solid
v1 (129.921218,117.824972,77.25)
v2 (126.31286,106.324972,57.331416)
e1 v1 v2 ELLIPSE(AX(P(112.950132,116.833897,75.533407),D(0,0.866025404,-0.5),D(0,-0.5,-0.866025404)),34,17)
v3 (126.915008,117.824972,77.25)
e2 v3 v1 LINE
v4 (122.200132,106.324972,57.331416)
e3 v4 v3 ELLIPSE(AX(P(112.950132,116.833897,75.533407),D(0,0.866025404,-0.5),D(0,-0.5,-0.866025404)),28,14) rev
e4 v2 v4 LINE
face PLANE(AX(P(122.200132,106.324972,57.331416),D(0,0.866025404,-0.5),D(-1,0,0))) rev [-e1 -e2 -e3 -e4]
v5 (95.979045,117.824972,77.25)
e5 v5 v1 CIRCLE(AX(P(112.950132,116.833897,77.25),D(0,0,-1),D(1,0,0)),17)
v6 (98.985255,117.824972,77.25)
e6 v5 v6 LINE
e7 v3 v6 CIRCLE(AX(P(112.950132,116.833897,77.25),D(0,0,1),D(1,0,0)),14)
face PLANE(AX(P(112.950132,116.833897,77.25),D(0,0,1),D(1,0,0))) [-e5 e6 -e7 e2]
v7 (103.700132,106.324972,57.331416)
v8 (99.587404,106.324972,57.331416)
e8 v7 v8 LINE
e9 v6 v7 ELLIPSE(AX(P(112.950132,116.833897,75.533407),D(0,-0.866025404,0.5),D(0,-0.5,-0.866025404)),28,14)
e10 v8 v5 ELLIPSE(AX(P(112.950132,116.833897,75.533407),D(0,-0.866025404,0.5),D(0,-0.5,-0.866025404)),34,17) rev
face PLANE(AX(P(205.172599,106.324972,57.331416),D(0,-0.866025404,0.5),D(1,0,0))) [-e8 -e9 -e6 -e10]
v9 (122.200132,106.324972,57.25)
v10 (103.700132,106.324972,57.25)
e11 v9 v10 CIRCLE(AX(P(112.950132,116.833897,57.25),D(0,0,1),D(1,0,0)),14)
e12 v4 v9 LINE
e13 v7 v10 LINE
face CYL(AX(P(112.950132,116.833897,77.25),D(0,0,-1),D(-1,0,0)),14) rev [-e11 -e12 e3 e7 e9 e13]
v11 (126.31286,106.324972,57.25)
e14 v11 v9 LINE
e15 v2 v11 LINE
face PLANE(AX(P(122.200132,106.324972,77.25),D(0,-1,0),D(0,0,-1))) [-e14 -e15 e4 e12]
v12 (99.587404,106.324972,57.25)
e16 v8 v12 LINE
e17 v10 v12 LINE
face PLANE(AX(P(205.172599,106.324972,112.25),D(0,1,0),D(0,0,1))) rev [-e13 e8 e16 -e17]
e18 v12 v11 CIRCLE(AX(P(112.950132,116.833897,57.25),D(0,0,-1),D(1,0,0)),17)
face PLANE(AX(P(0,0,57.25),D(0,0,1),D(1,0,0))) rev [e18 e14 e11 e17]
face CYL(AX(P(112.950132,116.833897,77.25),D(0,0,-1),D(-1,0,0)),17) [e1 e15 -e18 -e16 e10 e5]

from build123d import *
from OCP.BRepAlgoAPI import BRepAlgoAPI_Cut
from OCP.TopTools import TopTools_ListOfShape

# Parameters (mm, degrees)
BOSS_EXTRUDE1_DEPTH              = 5
SKETCH2_R                        = 2.5
BOSS_EXTRUDE2_DEPTH              = 100
SKETCH3_W                        = 5
SKETCH3_H                        = 5
BOSS_EXTRUDE3_DEPTH              = 10
SKETCH5_W                        = 5
SKETCH5_H                        = 4.330127019
BOSS_EXTRUDE4_DEPTH              = 117
SKETCH6_W                        = 5
SKETCH6_H                        = 5
BOSS_EXTRUDE5_DEPTH              = 20
BOSS_EXTRUDE6_DEPTH              = 15
SKETCH9_W                        = 5
SKETCH9_H                        = 5
BOSS_EXTRUDE7_DEPTH              = 10
SKETCH10_W                       = 5
SKETCH10_H                       = 5
BOSS_EXTRUDE8_DEPTH              = 99.159909
SKETCH11_W                       = 10
SKETCH11_H                       = 3
BOSS_EXTRUDE9_DEPTH              = 10
CUT_EXTRUDE1_DEPTH               = 187.084790711
CUT_EXTRUDE1_DEPTH_BACK          = 187.084790711
SKETCH13_R                       = 2
SKETCH14_W                       = 10
SKETCH14_H                       = 3
BOSS_EXTRUDE10_DEPTH             = 20
CUT_EXTRUDE2_DEPTH               = 194.255140511
CUT_EXTRUDE2_DEPTH_BACK          = 194.255140511
SKETCH15_R                       = 2
BOSS_EXTRUDE11_DEPTH             = 7.8
CUT_EXTRUDE3_DEPTH               = 187.016127587
CUT_EXTRUDE3_DEPTH_BACK          = 187.016127587
SKETCH17_W                       = 22.17902444
SKETCH17_H                       = 20
BOSS_EXTRUDE12_DEPTH             = 5.75
BOSS_EXTRUDE12_DEPTH_BACK        = 5
SKETCH19_W                       = 1.5
SKETCH19_H                       = 10.75
BOSS_EXTRUDE13_DEPTH             = 2.742414
SKETCH21_W                       = 1.5
SKETCH21_H                       = 1
BOSS_EXTRUDE15_DEPTH             = 1
BOSS_EXTRUDE17_REACH             = 195.512
CUT_EXTRUDE4_START               = 2
SKETCH23_W                       = 7.8
SKETCH23_H                       = 12
CUT_EXTRUDE4_DEPTH               = 10
BOSS_EXTRUDE19_DEPTH             = 5
BOSS_EXTRUDE19_DEPTH_BACK        = 2.165064
SKETCH23_2_W                     = 7.8
SKETCH23_2_H                     = 12
CUT_EXTRUDE5_DEPTH               = 1.25
BOSS_EXTRUDE20_REACH             = 188.016
SKETCH25_W                       = 5
SKETCH25_H                       = 4.330127019
SKETCH26_W                       = 5
SKETCH26_H                       = 2.16506351
CUT_EXTRUDE6_DEPTH               = 5
SKETCH27_W                       = 5.75
SKETCH27_H                       = 7.16506351
BOSS_EXTRUDE21_DEPTH             = 5
SKETCH29_W                       = 3
SKETCH29_H                       = 30
BOSS_EXTRUDE22_DEPTH             = 55
SKETCH30_W                       = 5
SKETCH30_H                       = 3
BOSS_EXTRUDE23_DEPTH             = 5
SKETCH31_W                       = 5
SKETCH31_H                       = 5
BOSS_EXTRUDE24_DEPTH             = 33.5
SKETCH32_W                       = 2
SKETCH32_H                       = 19
BOSS_EXTRUDE25_DEPTH             = 12
SKETCH34_W                       = 41
SKETCH34_H                       = 3
CUT_EXTRUDE7_DEPTH               = 30
SKETCH35_W                       = 14
SKETCH35_H                       = 12
BOSS_EXTRUDE26_DEPTH             = 7
BOSS_EXTRUDE27_REACH             = 187.154
SKETCH36_W                       = 9
SKETCH36_H                       = 5
BOSS_EXTRUDE27_DIRECTION_2_REACH = 187.154
SKETCH37_W                       = 41.5
SKETCH37_H                       = 5
BOSS_EXTRUDE28_DEPTH             = 41
SKETCH38_W                       = 34.251665069
SKETCH38_H                       = 27.087918127
CUT_EXTRUDE8_DEPTH               = 185.330721404
SKETCH39_W                       = 67.684653824
SKETCH39_H                       = 30.030202731
CUT_EXTRUDE9_DEPTH               = 190.235302527
SKETCH44_W                       = 5
SKETCH44_H                       = 7.16506351
BOSS_EXTRUDE30_DEPTH             = 18.612596
BOSS_EXTRUDE31_DEPTH             = 20
BOSS_EXTRUDE32_DEPTH             = 15
SKETCH46_W                       = 5
SKETCH46_H                       = 5
EDIT_THIS_LENGTH_DEPTH           = 50
SKETCH47_W                       = 5
SKETCH47_H                       = 3
BOSS_EXTRUDE34_DEPTH             = 5
CUT_EXTRUDE11_DEPTH              = 203.657530065
CUT_EXTRUDE11_DEPTH_BACK         = 203.657530065
SKETCH53_W                       = 268.348847746
SKETCH53_H                       = 124.858242806


with BuildPart() as part:
    # Sketch1 → Boss-Extrude1 (new body)
    with BuildSketch(Plane(origin=(0, 0, 0), x_dir=(1, 0, 0), z_dir=(0, 1, 0))):
        Polygon((121, 0), (0, 0), (0, -68), (5, -68), (5, -5), (116, -5), (116, -68), (121, -68), align=None)
    extrude(amount=BOSS_EXTRUDE1_DEPTH)

    # Sketch2 → Boss-Extrude2 (add)
    with BuildSketch(Plane(origin=(0, 3.75, 2.165063509), x_dir=(1, 0, 0), z_dir=(0, 0.866025403784438, 0.500000000000001))):
        with Locations(Location((118.200131686, -0.299868314, 0), (0, 0, 90))):
            Circle(SKETCH2_R)
    extrude(amount=BOSS_EXTRUDE2_DEPTH)

    # Sketch3 → Boss-Extrude3 (add)
    with BuildSketch(Plane(origin=(121, 0, 0), x_dir=(0, 0, -1), z_dir=(1, 0, 0))):
        with Locations((-2.5, 2.5)):
            Rectangle(SKETCH3_W, SKETCH3_H)
    extrude(amount=BOSS_EXTRUDE3_DEPTH)

    # Sketch5 → Boss-Extrude4 (add)
    with BuildSketch(Plane(origin=(0, 3.75, 2.165063509), x_dir=(1, 0, 0), z_dir=(0, 0.866025403784438, 0.500000000000001))):
        with Locations((128.5, 0.33493649)):
            Rectangle(SKETCH5_W, SKETCH5_H)
    extrude(amount=BOSS_EXTRUDE4_DEPTH)

    # Sketch6 → Boss-Extrude5 (add)
    with BuildSketch(Plane(origin=(0, 1.25, -2.165063509), x_dir=(-1, 0, 0), z_dir=(0, 0.5000000000000009, -0.866025403784438))):
        with Locations((-128.5, 118.830127019)):
            Rectangle(SKETCH6_W, SKETCH6_H)
    extrude(amount=BOSS_EXTRUDE5_DEPTH)

    # Sketch7 → Boss-Extrude6 (add)
    with BuildSketch(Plane.ZY.offset(-126)):
        Polygon((45.509618943, 113.824972243), (41.179491924, 116.324972243), (38.679491924, 111.994845224), (43.009618943, 109.494845224), align=None)
    extrude(amount=BOSS_EXTRUDE6_DEPTH)

    # Sketch9 → Boss-Extrude7 (add)
    with BuildSketch(Plane(origin=(121, 0, 0), x_dir=(0, 0, -1), z_dir=(1, 0, 0))):
        with Locations((-59.75, 2.5)):
            Rectangle(SKETCH9_W, SKETCH9_H)
    extrude(amount=BOSS_EXTRUDE7_DEPTH)

    # Sketch10 → Boss-Extrude8 (add)
    with BuildSketch(Plane(origin=(0, 5, 0), x_dir=(1, 0, 0), z_dir=(0, 1, 0))):
        with Locations((128.5, -59.75)):
            Rectangle(SKETCH10_W, SKETCH10_H)
    extrude(amount=BOSS_EXTRUDE8_DEPTH)

    # Sketch11 → Boss-Extrude9 (add)
    with BuildSketch(Plane.ZY):
        with Locations((57.25, 1.5)):
            Rectangle(SKETCH11_W, SKETCH11_H)
        with Locations((5, 1.5)):
            Rectangle(SKETCH11_W, SKETCH11_H)
    extrude(amount=BOSS_EXTRUDE9_DEPTH)

    # Sketch13 → Cut-Extrude1 (cut, two sides: drawn at the far end of the back side and taken through both)
    with BuildSketch(Plane(origin=(0, 3, 0), x_dir=(1, 0, 0), z_dir=(0, 1, 0)).offset(-CUT_EXTRUDE1_DEPTH_BACK)):
        with Locations(Location((-5, -5, 0), (0, 0, 270))):
            Circle(SKETCH13_R)
        with Locations(Location((-5, -57.25, 0), (0, 0, 270))):
            Circle(SKETCH13_R)
    extrude(amount=CUT_EXTRUDE1_DEPTH + CUT_EXTRUDE1_DEPTH_BACK, mode=Mode.SUBTRACT)

    # Sketch14 → Boss-Extrude10 (add)
    with BuildSketch(Plane(origin=(121, 0, 0), x_dir=(0, 0, -1), z_dir=(1, 0, 0))):
        with Locations((-15, 1.5)):
            Rectangle(SKETCH14_W, SKETCH14_H)
        with Locations((-47.25, 1.5)):
            Rectangle(SKETCH14_W, SKETCH14_H)
    extrude(amount=BOSS_EXTRUDE10_DEPTH)

    # Sketch15 → Cut-Extrude2 (cut, two sides: drawn at the far end of the back side and taken through both)
    with BuildSketch(Plane(origin=(0, 3, 0), x_dir=(1, 0, 0), z_dir=(0, 1, 0)).offset(-CUT_EXTRUDE2_DEPTH_BACK)):
        with Locations(Location((136, -15, 0), (0, 0, 270))):
            Circle(SKETCH15_R)
        with Locations(Location((136, -47.25, 0), (0, 0, 270))):
            Circle(SKETCH15_R)
    extrude(amount=CUT_EXTRUDE2_DEPTH + CUT_EXTRUDE2_DEPTH_BACK, mode=Mode.SUBTRACT)

    # Sketch16 → Boss-Extrude11 (add)
    with BuildSketch(Plane.ZY.offset(-126)):
        Polygon((49.839745962, 111.324972243), (67, 101.417494955), (64.5, 97.087367936), (47.339745962, 106.994845224), align=None)
    extrude(amount=BOSS_EXTRUDE11_DEPTH)

    # Sketch17 → Cut-Extrude3 (cut, two sides: drawn at the far end of the back side and taken through both)
    with BuildSketch(Plane(origin=(0, 105.074972243, 60.665063509), x_dir=(1, 0, 0), z_dir=(0, 0.8660254037844382, 0.500000000000001)).offset(-CUT_EXTRUDE3_DEPTH_BACK)):
        with Locations((119.91048778, 12.5)):
            Rectangle(SKETCH17_W, SKETCH17_H)
    extrude(amount=CUT_EXTRUDE3_DEPTH + CUT_EXTRUDE3_DEPTH_BACK, mode=Mode.SUBTRACT)



with BuildPart() as body_2:
    # Sketch18 → Boss-Extrude12 (new, two sides: drawn at the far end of the back side and taken through both)
    with BuildSketch(Plane.XY.offset(62.25).offset(-BOSS_EXTRUDE12_DEPTH_BACK)):
        with BuildLine():
            Line((118.2, 104.159908733), (119.7, 104.159908733))
            ThreePointArc((119.7, 104.159908733), (110.2, 113.659908733), (100.7, 104.159908733))
            Line((100.7, 104.159908733), (102.2, 104.159908733))
            ThreePointArc((102.2, 104.159908733), (110.2, 112.159908733), (118.2, 104.159908733))
        make_face()
    extrude(amount=BOSS_EXTRUDE12_DEPTH + BOSS_EXTRUDE12_DEPTH_BACK)


with BuildPart() as part_1:
    add(part.part)

    add(body_2.part)  # Boss-Extrude13 merges body 2
    # Sketch19 → Boss-Extrude13 (add)
    with BuildSketch(Plane.XZ.offset(-104.159908733)):
        with Locations((118.95, 62.625)):
            Rectangle(SKETCH19_W, SKETCH19_H)
    extrude(amount=BOSS_EXTRUDE13_DEPTH)

    # Sketch21 → Boss-Extrude15 (add)
    with BuildSketch(Plane.XZ.offset(-101.417494955)):
        with Locations((118.95, 67.5)):
            Rectangle(SKETCH21_W, SKETCH21_H)
    extrude(amount=BOSS_EXTRUDE15_DEPTH)

    # Boss-Extrude17: up to this plane
    boss_extrude17_end = Plane(origin=(119.7, 101.417494955, 68), z_dir=(0, 0, -1))
    # Sketch20 → Boss-Extrude17 (add, up to the surface)
    with BuildSketch(Plane(origin=(0, -3.657477288, 6.334936491), x_dir=(1, 0, 0), z_dir=(0, -0.5000000000000039, 0.8660254037844365)), mode=Mode.PRIVATE) as boss_extrude17_sk1:
        Polygon((126, 116.330127019), (126, 121.330127019), (119.7, 121.330127019), (118.2, 121.330127019), (118.2, 116.330127019), align=None)
    boss_extrude17_tool1 = split(extrude(boss_extrude17_sk1.sketch, amount=BOSS_EXTRUDE17_REACH, mode=Mode.PRIVATE), bisect_by=boss_extrude17_end, keep=Keep.BOTH, mode=Mode.PRIVATE)
    add(boss_extrude17_tool1.solids().sort_by_distance((122.1, 99.252431, 65.75))[0])

    # Sketch23 → Cut-Extrude4 (cut)
    with BuildSketch(Plane(origin=(0, 104.159908733, 0), x_dir=(-1, 0, 0), z_dir=(0, -1, 0)).offset(CUT_EXTRUDE4_START)):
        with Locations((-122.1, -62)):
            Rectangle(SKETCH23_W, SKETCH23_H)
    extrude(amount=CUT_EXTRUDE4_DEPTH, mode=Mode.SUBTRACT)

    # Sketch23<2> → Boss-Extrude19 (add, two sides: drawn at the far end of the back side and taken through both)
    with BuildSketch(Plane(origin=(0, 104.159908733, 0), x_dir=(-1, 0, 0), z_dir=(0, -1, 0)).offset(-BOSS_EXTRUDE19_DEPTH_BACK)):
        with Locations((-122.1, -62)):
            Rectangle(SKETCH23_2_W, SKETCH23_2_H)
    extrude(amount=BOSS_EXTRUDE19_DEPTH + BOSS_EXTRUDE19_DEPTH_BACK)


with BuildPart() as cut_extrude5_tool:
    # Sketch24 → Cut-Extrude5 (new body)
    with BuildSketch(Plane(origin=(0, 0, 56), x_dir=(-1, 0, 0), z_dir=(0, 0, -1))):
        Polygon((-126, 106.324972243), (-126, 101.994845224), (-126, 99.159908733), (-118.2, 99.159908733), (-118.2, 106.324972243), align=None)
    extrude(amount=-CUT_EXTRUDE5_DEPTH)


with BuildPart() as part_2:
    add(part_1.part)

    # Cut-Extrude5: cut by cut_extrude5_tool, with a tolerance
    cut_extrude5_stock = TopTools_ListOfShape()
    cut_extrude5_stock.Append(part_2.part.wrapped)
    cut_extrude5_tools = TopTools_ListOfShape()
    cut_extrude5_tools.Append(cut_extrude5_tool.part.wrapped)
    cut_extrude5_cut = BRepAlgoAPI_Cut()
    cut_extrude5_cut.SetArguments(cut_extrude5_stock)
    cut_extrude5_cut.SetTools(cut_extrude5_tools)
    cut_extrude5_cut.SetFuzzyValue(0.00001)
    cut_extrude5_cut.Build()
    add(Compound.cast(cut_extrude5_cut.Shape()).solids(), mode=Mode.REPLACE)

    # Boss-Extrude20: up to this face of the body (flat: up to its plane)
    boss_extrude20_end = Plane(part_2.part.faces().sort_by_distance((122.724999943, 106.324972733, 62.625))[0])
    # Sketch25 → Boss-Extrude20 (add, up to the picked face)
    with BuildSketch(Plane(origin=(0, 105.074972243, 60.665063509), x_dir=(1, 0, 0), z_dir=(0, 0.8660254037844382, 0.500000000000001)), mode=Mode.PRIVATE) as boss_extrude20_sk1:
        with Locations((128.5, 0.33493649)):
            Rectangle(SKETCH25_W, SKETCH25_H)
    boss_extrude20_tool1 = split(extrude(boss_extrude20_sk1.sketch, amount=BOSS_EXTRUDE20_REACH, mode=Mode.PRIVATE), bisect_by=boss_extrude20_end, keep=Keep.BOTH, mode=Mode.PRIVATE)
    add(boss_extrude20_tool1.solids().sort_by(Axis((128.5, 105.24244, 60.375), (0, 0.8660254037844382, 0.500000000000001)))[0])


with BuildPart() as cut_extrude6_tool:
    # Sketch26 → Cut-Extrude6 (new body)
    with BuildSketch(Plane.XY.offset(62.25)):
        with Locations((128.5, 105.242440488)):
            Rectangle(SKETCH26_W, SKETCH26_H)
    extrude(amount=CUT_EXTRUDE6_DEPTH)


with BuildPart() as part_3:
    add(part_2.part)

    # Cut-Extrude6: cut by cut_extrude6_tool, with a tolerance
    cut_extrude6_stock = TopTools_ListOfShape()
    cut_extrude6_stock.Append(part_3.part.wrapped)
    cut_extrude6_tools = TopTools_ListOfShape()
    cut_extrude6_tools.Append(cut_extrude6_tool.part.wrapped)
    cut_extrude6_cut = BRepAlgoAPI_Cut()
    cut_extrude6_cut.SetArguments(cut_extrude6_stock)
    cut_extrude6_cut.SetTools(cut_extrude6_tools)
    cut_extrude6_cut.SetFuzzyValue(0.00001)
    cut_extrude6_cut.Build()
    add(Compound.cast(cut_extrude6_cut.Shape()).solids(), mode=Mode.REPLACE)

    # Sketch27 → Boss-Extrude21 (add)
    with BuildSketch(Plane(origin=(126, 0, 0), x_dir=(0, 0, -1), z_dir=(1, 0, 0))):
        with Locations((-65.125, 102.742440488)):
            Rectangle(SKETCH27_W, SKETCH27_H)
    extrude(amount=BOSS_EXTRUDE21_DEPTH)

    # Sketch29 → Boss-Extrude22 (add)
    with BuildSketch(Plane.ZY):
        with Locations((40, 20)):
            Rectangle(SKETCH29_W, SKETCH29_H)
    extrude(amount=-BOSS_EXTRUDE22_DEPTH)

    # Sketch30 → Boss-Extrude23 (add)
    with BuildSketch(Plane.XZ.offset(-5)):
        with Locations((52.5, 40)):
            Rectangle(SKETCH30_W, SKETCH30_H)
    extrude(amount=BOSS_EXTRUDE23_DEPTH)

    # Sketch31 → Boss-Extrude24 (add)
    with BuildSketch(Plane(origin=(0, 0, 38.5), x_dir=(-1, 0, 0), z_dir=(0, 0, -1))):
        with Locations((-52.5, 2.5)):
            Rectangle(SKETCH31_W, SKETCH31_H)
    extrude(amount=BOSS_EXTRUDE24_DEPTH)

    # Sketch32 → Boss-Extrude25 (add)
    with BuildSketch(Plane(origin=(0, 0, 38.5), x_dir=(-1, 0, 0), z_dir=(0, 0, -1))):
        Polygon((-41, 9), (-53, 9), (-53, 35), (-55, 35), (-55, 7), (-41, 7), align=None)
        with Locations((-42, 25.5)):
            Rectangle(SKETCH32_W, SKETCH32_H)
    extrude(amount=BOSS_EXTRUDE25_DEPTH)

    # Sketch34 → Cut-Extrude7 (cut)
    with BuildSketch(Plane(origin=(0, 35, 0), x_dir=(1, 0, 0), z_dir=(0, 1, 0))):
        with Locations((20.5, -40)):
            Rectangle(SKETCH34_W, SKETCH34_H)
    extrude(amount=-CUT_EXTRUDE7_DEPTH, mode=Mode.SUBTRACT)

    # Sketch35 → Boss-Extrude26 (add)
    with BuildSketch(Plane.XZ.offset(-7)):
        with Locations((48, 32.5)):
            Rectangle(SKETCH35_W, SKETCH35_H)
    extrude(amount=BOSS_EXTRUDE26_DEPTH)

    # Boss-Extrude27: up to this face of the body (flat: up to its plane)
    boss_extrude27_end = Plane(part_3.part.faces().sort_by_distance((48.252808989, 19.016853933, 41.5))[0])
    # Sketch36 → Boss-Extrude27 (add, up to the picked face)
    with BuildSketch(Plane.XY.offset(38.5), mode=Mode.PRIVATE) as boss_extrude27_sk1:
        with Locations((45.5, 2.5)):
            Rectangle(SKETCH36_W, SKETCH36_H)
    boss_extrude27_tool1 = split(extrude(boss_extrude27_sk1.sketch, amount=BOSS_EXTRUDE27_REACH, mode=Mode.PRIVATE), bisect_by=boss_extrude27_end, keep=Keep.BOTH, mode=Mode.PRIVATE)
    add(boss_extrude27_tool1.solids().sort_by(Axis((45.5, 2.5, 38.5), (0, 0, 1)))[0])

    # Boss-Extrude27 direction 2: up to this face of the body (flat: up to its plane)
    boss_extrude27_direction_2_end = Plane(part_3.part.faces().sort_by_distance((27.5, 2.5, 5))[0])
    # Sketch36 → Boss-Extrude27 direction 2 (add, up to the picked face)
    with BuildSketch(Plane.XY.offset(38.5), mode=Mode.PRIVATE) as boss_extrude27_direction_2_sk1:
        with Locations((45.5, 2.5)):
            Rectangle(SKETCH36_W, SKETCH36_H)
    boss_extrude27_direction_2_tool1 = split(extrude(boss_extrude27_direction_2_sk1.sketch, amount=-BOSS_EXTRUDE27_DIRECTION_2_REACH, mode=Mode.PRIVATE), bisect_by=boss_extrude27_direction_2_end, keep=Keep.BOTH, mode=Mode.PRIVATE)
    add(boss_extrude27_direction_2_tool1.solids().sort_by(Axis((45.5, 2.5, 38.5), (0, 0, -1)))[0])

    # Sketch37 → Boss-Extrude28 (add)
    with BuildSketch(Plane.ZY.offset(-41)):
        with Locations((20.75, 2.5)):
            Rectangle(SKETCH37_W, SKETCH37_H)
    extrude(amount=BOSS_EXTRUDE28_DEPTH)

    # Sketch38 → Cut-Extrude8 (cut, through all)
    with BuildSketch(Plane.ZY.offset(-118.2)):
        with Locations((61.183105348, 109.662346151)):
            Rectangle(SKETCH38_W, SKETCH38_H)
    extrude(amount=CUT_EXTRUDE8_DEPTH, mode=Mode.SUBTRACT)

    # Sketch39 → Cut-Extrude9 (cut, through all)
    with BuildSketch(Plane(origin=(0, 106.324972243, 0), x_dir=(1, 0, 0), z_dir=(0, 1, 0))):
        with Locations((120.498501698, -57.225220953)):
            Rectangle(SKETCH39_W, SKETCH39_H)
    extrude(amount=CUT_EXTRUDE9_DEPTH, mode=Mode.SUBTRACT)

    # Sketch44 → Boss-Extrude30 (add)
    with BuildSketch(Plane.ZY.offset(-118.2)):
        with Locations((59.75, 102.742440488)):
            Rectangle(SKETCH44_W, SKETCH44_H)
    extrude(amount=BOSS_EXTRUDE30_DEPTH)

    # Sketch43 → Boss-Extrude31 (add)
    with BuildSketch(Plane(origin=(0, 0, 57.25), x_dir=(-1, 0, 0), z_dir=(0, 0, -1))):
        with BuildLine():
            Line((-122.200131686, 106.324972243), (-126, 106.324972243))
            Line((-126, 106.324972243), (-126.312859701, 106.324972243))
            ThreePointArc((-126.312859701, 106.324972243), (-112.950131686, 133.833897021), (-99.587403671, 106.324972243))
            Line((-99.587403671, 106.324972243), (-103.700131686, 106.324972243))
            ThreePointArc((-103.700131686, 106.324972243), (-112.950131686, 130.833897021), (-122.200131686, 106.324972243))
        make_face()
    extrude(amount=-BOSS_EXTRUDE31_DEPTH)

    # Sketch45 → Boss-Extrude32 (add)
    with BuildSketch(Plane.XY.offset(62.25)):
        Polygon((118.2, 99.159908733), (118.2, 106.324972243), (103.700131686, 106.324972243), (99.587403671, 106.324972243), (99.587403671, 99.159908733), align=None)
    extrude(amount=BOSS_EXTRUDE32_DEPTH)

    # Sketch46 → EDIT THIS LENGTH (add)
    with BuildSketch(Plane.XY.offset(62.25)):
        with Locations((128.5, 86.659908733)):
            Rectangle(SKETCH46_W, SKETCH46_H)
    extrude(amount=EDIT_THIS_LENGTH_DEPTH)

    # Sketch47 → Boss-Extrude34 (add)
    with BuildSketch(Plane(origin=(0, 89.159908733, 0), x_dir=(1, 0, 0), z_dir=(0, 1, 0))):
        with Locations((128.5, -110.75)):
            Rectangle(SKETCH47_W, SKETCH47_H)
    extrude(amount=BOSS_EXTRUDE34_DEPTH)

    # Sketch53 → Cut-Extrude11 (cut, two sides: drawn at the far end of the back side and taken through both)
    with BuildSketch(Plane(origin=(0, 0, 57.25), x_dir=(-1, 0, 0), z_dir=(0, 0, -1)).offset(-CUT_EXTRUDE11_DEPTH_BACK)):
        with Locations((-70.998175197, 43.89585084)):
            Rectangle(SKETCH53_W, SKETCH53_H)
    extrude(amount=CUT_EXTRUDE11_DEPTH + CUT_EXTRUDE11_DEPTH_BACK, mode=Mode.SUBTRACT)


with BuildPart() as cut_extrude11_kept_piece:
    # of the separate pieces the step leaves, the one the design keeps (cut_extrude11_pieces_kept)
    add(part_3.part.solids().sort_by_distance((126.312859701, 106.324972243, 57.25))[0])

    # Chamfer1
    # the kernel refuses this chamfer: 19.918584287, 11.5 mm, written as the material it takes off along each edge
    with BuildSketch(Plane(origin=(177.843945363, 106.324972243, 77.25), x_dir=(0, 0, -1), z_dir=(-1, 0, 0)), Plane(origin=(155.231217348, 106.324972243, 77.25), x_dir=(0, 0, -1), z_dir=(-1, 0, 0))) as chamfer1_piece_1:
        with BuildLine():
            Line((20.608584287, 0.398371686), (-0.69, -11.898371686))
            Line((-0.69, -11.898371686), (-1.088371686, -11.898371686))
            ThreePointArc((-1.088371686, -11.898371686), (-0.398371686, -5.949185843), (-0.398371686, 0))
            Line((-0.398371686, 0), (0, 0.398371686))
            ThreePointArc((0, 0.398371686), (10.304292144, 0.398371686), (20.608584287, 0.796743371))
            Line((20.608584287, 0.796743371), (20.608584287, 0.398371686))
        make_face()
    extrude(amount=107.174899338, mode=Mode.SUBTRACT)


solid = cut_extrude11_kept_piece.part
